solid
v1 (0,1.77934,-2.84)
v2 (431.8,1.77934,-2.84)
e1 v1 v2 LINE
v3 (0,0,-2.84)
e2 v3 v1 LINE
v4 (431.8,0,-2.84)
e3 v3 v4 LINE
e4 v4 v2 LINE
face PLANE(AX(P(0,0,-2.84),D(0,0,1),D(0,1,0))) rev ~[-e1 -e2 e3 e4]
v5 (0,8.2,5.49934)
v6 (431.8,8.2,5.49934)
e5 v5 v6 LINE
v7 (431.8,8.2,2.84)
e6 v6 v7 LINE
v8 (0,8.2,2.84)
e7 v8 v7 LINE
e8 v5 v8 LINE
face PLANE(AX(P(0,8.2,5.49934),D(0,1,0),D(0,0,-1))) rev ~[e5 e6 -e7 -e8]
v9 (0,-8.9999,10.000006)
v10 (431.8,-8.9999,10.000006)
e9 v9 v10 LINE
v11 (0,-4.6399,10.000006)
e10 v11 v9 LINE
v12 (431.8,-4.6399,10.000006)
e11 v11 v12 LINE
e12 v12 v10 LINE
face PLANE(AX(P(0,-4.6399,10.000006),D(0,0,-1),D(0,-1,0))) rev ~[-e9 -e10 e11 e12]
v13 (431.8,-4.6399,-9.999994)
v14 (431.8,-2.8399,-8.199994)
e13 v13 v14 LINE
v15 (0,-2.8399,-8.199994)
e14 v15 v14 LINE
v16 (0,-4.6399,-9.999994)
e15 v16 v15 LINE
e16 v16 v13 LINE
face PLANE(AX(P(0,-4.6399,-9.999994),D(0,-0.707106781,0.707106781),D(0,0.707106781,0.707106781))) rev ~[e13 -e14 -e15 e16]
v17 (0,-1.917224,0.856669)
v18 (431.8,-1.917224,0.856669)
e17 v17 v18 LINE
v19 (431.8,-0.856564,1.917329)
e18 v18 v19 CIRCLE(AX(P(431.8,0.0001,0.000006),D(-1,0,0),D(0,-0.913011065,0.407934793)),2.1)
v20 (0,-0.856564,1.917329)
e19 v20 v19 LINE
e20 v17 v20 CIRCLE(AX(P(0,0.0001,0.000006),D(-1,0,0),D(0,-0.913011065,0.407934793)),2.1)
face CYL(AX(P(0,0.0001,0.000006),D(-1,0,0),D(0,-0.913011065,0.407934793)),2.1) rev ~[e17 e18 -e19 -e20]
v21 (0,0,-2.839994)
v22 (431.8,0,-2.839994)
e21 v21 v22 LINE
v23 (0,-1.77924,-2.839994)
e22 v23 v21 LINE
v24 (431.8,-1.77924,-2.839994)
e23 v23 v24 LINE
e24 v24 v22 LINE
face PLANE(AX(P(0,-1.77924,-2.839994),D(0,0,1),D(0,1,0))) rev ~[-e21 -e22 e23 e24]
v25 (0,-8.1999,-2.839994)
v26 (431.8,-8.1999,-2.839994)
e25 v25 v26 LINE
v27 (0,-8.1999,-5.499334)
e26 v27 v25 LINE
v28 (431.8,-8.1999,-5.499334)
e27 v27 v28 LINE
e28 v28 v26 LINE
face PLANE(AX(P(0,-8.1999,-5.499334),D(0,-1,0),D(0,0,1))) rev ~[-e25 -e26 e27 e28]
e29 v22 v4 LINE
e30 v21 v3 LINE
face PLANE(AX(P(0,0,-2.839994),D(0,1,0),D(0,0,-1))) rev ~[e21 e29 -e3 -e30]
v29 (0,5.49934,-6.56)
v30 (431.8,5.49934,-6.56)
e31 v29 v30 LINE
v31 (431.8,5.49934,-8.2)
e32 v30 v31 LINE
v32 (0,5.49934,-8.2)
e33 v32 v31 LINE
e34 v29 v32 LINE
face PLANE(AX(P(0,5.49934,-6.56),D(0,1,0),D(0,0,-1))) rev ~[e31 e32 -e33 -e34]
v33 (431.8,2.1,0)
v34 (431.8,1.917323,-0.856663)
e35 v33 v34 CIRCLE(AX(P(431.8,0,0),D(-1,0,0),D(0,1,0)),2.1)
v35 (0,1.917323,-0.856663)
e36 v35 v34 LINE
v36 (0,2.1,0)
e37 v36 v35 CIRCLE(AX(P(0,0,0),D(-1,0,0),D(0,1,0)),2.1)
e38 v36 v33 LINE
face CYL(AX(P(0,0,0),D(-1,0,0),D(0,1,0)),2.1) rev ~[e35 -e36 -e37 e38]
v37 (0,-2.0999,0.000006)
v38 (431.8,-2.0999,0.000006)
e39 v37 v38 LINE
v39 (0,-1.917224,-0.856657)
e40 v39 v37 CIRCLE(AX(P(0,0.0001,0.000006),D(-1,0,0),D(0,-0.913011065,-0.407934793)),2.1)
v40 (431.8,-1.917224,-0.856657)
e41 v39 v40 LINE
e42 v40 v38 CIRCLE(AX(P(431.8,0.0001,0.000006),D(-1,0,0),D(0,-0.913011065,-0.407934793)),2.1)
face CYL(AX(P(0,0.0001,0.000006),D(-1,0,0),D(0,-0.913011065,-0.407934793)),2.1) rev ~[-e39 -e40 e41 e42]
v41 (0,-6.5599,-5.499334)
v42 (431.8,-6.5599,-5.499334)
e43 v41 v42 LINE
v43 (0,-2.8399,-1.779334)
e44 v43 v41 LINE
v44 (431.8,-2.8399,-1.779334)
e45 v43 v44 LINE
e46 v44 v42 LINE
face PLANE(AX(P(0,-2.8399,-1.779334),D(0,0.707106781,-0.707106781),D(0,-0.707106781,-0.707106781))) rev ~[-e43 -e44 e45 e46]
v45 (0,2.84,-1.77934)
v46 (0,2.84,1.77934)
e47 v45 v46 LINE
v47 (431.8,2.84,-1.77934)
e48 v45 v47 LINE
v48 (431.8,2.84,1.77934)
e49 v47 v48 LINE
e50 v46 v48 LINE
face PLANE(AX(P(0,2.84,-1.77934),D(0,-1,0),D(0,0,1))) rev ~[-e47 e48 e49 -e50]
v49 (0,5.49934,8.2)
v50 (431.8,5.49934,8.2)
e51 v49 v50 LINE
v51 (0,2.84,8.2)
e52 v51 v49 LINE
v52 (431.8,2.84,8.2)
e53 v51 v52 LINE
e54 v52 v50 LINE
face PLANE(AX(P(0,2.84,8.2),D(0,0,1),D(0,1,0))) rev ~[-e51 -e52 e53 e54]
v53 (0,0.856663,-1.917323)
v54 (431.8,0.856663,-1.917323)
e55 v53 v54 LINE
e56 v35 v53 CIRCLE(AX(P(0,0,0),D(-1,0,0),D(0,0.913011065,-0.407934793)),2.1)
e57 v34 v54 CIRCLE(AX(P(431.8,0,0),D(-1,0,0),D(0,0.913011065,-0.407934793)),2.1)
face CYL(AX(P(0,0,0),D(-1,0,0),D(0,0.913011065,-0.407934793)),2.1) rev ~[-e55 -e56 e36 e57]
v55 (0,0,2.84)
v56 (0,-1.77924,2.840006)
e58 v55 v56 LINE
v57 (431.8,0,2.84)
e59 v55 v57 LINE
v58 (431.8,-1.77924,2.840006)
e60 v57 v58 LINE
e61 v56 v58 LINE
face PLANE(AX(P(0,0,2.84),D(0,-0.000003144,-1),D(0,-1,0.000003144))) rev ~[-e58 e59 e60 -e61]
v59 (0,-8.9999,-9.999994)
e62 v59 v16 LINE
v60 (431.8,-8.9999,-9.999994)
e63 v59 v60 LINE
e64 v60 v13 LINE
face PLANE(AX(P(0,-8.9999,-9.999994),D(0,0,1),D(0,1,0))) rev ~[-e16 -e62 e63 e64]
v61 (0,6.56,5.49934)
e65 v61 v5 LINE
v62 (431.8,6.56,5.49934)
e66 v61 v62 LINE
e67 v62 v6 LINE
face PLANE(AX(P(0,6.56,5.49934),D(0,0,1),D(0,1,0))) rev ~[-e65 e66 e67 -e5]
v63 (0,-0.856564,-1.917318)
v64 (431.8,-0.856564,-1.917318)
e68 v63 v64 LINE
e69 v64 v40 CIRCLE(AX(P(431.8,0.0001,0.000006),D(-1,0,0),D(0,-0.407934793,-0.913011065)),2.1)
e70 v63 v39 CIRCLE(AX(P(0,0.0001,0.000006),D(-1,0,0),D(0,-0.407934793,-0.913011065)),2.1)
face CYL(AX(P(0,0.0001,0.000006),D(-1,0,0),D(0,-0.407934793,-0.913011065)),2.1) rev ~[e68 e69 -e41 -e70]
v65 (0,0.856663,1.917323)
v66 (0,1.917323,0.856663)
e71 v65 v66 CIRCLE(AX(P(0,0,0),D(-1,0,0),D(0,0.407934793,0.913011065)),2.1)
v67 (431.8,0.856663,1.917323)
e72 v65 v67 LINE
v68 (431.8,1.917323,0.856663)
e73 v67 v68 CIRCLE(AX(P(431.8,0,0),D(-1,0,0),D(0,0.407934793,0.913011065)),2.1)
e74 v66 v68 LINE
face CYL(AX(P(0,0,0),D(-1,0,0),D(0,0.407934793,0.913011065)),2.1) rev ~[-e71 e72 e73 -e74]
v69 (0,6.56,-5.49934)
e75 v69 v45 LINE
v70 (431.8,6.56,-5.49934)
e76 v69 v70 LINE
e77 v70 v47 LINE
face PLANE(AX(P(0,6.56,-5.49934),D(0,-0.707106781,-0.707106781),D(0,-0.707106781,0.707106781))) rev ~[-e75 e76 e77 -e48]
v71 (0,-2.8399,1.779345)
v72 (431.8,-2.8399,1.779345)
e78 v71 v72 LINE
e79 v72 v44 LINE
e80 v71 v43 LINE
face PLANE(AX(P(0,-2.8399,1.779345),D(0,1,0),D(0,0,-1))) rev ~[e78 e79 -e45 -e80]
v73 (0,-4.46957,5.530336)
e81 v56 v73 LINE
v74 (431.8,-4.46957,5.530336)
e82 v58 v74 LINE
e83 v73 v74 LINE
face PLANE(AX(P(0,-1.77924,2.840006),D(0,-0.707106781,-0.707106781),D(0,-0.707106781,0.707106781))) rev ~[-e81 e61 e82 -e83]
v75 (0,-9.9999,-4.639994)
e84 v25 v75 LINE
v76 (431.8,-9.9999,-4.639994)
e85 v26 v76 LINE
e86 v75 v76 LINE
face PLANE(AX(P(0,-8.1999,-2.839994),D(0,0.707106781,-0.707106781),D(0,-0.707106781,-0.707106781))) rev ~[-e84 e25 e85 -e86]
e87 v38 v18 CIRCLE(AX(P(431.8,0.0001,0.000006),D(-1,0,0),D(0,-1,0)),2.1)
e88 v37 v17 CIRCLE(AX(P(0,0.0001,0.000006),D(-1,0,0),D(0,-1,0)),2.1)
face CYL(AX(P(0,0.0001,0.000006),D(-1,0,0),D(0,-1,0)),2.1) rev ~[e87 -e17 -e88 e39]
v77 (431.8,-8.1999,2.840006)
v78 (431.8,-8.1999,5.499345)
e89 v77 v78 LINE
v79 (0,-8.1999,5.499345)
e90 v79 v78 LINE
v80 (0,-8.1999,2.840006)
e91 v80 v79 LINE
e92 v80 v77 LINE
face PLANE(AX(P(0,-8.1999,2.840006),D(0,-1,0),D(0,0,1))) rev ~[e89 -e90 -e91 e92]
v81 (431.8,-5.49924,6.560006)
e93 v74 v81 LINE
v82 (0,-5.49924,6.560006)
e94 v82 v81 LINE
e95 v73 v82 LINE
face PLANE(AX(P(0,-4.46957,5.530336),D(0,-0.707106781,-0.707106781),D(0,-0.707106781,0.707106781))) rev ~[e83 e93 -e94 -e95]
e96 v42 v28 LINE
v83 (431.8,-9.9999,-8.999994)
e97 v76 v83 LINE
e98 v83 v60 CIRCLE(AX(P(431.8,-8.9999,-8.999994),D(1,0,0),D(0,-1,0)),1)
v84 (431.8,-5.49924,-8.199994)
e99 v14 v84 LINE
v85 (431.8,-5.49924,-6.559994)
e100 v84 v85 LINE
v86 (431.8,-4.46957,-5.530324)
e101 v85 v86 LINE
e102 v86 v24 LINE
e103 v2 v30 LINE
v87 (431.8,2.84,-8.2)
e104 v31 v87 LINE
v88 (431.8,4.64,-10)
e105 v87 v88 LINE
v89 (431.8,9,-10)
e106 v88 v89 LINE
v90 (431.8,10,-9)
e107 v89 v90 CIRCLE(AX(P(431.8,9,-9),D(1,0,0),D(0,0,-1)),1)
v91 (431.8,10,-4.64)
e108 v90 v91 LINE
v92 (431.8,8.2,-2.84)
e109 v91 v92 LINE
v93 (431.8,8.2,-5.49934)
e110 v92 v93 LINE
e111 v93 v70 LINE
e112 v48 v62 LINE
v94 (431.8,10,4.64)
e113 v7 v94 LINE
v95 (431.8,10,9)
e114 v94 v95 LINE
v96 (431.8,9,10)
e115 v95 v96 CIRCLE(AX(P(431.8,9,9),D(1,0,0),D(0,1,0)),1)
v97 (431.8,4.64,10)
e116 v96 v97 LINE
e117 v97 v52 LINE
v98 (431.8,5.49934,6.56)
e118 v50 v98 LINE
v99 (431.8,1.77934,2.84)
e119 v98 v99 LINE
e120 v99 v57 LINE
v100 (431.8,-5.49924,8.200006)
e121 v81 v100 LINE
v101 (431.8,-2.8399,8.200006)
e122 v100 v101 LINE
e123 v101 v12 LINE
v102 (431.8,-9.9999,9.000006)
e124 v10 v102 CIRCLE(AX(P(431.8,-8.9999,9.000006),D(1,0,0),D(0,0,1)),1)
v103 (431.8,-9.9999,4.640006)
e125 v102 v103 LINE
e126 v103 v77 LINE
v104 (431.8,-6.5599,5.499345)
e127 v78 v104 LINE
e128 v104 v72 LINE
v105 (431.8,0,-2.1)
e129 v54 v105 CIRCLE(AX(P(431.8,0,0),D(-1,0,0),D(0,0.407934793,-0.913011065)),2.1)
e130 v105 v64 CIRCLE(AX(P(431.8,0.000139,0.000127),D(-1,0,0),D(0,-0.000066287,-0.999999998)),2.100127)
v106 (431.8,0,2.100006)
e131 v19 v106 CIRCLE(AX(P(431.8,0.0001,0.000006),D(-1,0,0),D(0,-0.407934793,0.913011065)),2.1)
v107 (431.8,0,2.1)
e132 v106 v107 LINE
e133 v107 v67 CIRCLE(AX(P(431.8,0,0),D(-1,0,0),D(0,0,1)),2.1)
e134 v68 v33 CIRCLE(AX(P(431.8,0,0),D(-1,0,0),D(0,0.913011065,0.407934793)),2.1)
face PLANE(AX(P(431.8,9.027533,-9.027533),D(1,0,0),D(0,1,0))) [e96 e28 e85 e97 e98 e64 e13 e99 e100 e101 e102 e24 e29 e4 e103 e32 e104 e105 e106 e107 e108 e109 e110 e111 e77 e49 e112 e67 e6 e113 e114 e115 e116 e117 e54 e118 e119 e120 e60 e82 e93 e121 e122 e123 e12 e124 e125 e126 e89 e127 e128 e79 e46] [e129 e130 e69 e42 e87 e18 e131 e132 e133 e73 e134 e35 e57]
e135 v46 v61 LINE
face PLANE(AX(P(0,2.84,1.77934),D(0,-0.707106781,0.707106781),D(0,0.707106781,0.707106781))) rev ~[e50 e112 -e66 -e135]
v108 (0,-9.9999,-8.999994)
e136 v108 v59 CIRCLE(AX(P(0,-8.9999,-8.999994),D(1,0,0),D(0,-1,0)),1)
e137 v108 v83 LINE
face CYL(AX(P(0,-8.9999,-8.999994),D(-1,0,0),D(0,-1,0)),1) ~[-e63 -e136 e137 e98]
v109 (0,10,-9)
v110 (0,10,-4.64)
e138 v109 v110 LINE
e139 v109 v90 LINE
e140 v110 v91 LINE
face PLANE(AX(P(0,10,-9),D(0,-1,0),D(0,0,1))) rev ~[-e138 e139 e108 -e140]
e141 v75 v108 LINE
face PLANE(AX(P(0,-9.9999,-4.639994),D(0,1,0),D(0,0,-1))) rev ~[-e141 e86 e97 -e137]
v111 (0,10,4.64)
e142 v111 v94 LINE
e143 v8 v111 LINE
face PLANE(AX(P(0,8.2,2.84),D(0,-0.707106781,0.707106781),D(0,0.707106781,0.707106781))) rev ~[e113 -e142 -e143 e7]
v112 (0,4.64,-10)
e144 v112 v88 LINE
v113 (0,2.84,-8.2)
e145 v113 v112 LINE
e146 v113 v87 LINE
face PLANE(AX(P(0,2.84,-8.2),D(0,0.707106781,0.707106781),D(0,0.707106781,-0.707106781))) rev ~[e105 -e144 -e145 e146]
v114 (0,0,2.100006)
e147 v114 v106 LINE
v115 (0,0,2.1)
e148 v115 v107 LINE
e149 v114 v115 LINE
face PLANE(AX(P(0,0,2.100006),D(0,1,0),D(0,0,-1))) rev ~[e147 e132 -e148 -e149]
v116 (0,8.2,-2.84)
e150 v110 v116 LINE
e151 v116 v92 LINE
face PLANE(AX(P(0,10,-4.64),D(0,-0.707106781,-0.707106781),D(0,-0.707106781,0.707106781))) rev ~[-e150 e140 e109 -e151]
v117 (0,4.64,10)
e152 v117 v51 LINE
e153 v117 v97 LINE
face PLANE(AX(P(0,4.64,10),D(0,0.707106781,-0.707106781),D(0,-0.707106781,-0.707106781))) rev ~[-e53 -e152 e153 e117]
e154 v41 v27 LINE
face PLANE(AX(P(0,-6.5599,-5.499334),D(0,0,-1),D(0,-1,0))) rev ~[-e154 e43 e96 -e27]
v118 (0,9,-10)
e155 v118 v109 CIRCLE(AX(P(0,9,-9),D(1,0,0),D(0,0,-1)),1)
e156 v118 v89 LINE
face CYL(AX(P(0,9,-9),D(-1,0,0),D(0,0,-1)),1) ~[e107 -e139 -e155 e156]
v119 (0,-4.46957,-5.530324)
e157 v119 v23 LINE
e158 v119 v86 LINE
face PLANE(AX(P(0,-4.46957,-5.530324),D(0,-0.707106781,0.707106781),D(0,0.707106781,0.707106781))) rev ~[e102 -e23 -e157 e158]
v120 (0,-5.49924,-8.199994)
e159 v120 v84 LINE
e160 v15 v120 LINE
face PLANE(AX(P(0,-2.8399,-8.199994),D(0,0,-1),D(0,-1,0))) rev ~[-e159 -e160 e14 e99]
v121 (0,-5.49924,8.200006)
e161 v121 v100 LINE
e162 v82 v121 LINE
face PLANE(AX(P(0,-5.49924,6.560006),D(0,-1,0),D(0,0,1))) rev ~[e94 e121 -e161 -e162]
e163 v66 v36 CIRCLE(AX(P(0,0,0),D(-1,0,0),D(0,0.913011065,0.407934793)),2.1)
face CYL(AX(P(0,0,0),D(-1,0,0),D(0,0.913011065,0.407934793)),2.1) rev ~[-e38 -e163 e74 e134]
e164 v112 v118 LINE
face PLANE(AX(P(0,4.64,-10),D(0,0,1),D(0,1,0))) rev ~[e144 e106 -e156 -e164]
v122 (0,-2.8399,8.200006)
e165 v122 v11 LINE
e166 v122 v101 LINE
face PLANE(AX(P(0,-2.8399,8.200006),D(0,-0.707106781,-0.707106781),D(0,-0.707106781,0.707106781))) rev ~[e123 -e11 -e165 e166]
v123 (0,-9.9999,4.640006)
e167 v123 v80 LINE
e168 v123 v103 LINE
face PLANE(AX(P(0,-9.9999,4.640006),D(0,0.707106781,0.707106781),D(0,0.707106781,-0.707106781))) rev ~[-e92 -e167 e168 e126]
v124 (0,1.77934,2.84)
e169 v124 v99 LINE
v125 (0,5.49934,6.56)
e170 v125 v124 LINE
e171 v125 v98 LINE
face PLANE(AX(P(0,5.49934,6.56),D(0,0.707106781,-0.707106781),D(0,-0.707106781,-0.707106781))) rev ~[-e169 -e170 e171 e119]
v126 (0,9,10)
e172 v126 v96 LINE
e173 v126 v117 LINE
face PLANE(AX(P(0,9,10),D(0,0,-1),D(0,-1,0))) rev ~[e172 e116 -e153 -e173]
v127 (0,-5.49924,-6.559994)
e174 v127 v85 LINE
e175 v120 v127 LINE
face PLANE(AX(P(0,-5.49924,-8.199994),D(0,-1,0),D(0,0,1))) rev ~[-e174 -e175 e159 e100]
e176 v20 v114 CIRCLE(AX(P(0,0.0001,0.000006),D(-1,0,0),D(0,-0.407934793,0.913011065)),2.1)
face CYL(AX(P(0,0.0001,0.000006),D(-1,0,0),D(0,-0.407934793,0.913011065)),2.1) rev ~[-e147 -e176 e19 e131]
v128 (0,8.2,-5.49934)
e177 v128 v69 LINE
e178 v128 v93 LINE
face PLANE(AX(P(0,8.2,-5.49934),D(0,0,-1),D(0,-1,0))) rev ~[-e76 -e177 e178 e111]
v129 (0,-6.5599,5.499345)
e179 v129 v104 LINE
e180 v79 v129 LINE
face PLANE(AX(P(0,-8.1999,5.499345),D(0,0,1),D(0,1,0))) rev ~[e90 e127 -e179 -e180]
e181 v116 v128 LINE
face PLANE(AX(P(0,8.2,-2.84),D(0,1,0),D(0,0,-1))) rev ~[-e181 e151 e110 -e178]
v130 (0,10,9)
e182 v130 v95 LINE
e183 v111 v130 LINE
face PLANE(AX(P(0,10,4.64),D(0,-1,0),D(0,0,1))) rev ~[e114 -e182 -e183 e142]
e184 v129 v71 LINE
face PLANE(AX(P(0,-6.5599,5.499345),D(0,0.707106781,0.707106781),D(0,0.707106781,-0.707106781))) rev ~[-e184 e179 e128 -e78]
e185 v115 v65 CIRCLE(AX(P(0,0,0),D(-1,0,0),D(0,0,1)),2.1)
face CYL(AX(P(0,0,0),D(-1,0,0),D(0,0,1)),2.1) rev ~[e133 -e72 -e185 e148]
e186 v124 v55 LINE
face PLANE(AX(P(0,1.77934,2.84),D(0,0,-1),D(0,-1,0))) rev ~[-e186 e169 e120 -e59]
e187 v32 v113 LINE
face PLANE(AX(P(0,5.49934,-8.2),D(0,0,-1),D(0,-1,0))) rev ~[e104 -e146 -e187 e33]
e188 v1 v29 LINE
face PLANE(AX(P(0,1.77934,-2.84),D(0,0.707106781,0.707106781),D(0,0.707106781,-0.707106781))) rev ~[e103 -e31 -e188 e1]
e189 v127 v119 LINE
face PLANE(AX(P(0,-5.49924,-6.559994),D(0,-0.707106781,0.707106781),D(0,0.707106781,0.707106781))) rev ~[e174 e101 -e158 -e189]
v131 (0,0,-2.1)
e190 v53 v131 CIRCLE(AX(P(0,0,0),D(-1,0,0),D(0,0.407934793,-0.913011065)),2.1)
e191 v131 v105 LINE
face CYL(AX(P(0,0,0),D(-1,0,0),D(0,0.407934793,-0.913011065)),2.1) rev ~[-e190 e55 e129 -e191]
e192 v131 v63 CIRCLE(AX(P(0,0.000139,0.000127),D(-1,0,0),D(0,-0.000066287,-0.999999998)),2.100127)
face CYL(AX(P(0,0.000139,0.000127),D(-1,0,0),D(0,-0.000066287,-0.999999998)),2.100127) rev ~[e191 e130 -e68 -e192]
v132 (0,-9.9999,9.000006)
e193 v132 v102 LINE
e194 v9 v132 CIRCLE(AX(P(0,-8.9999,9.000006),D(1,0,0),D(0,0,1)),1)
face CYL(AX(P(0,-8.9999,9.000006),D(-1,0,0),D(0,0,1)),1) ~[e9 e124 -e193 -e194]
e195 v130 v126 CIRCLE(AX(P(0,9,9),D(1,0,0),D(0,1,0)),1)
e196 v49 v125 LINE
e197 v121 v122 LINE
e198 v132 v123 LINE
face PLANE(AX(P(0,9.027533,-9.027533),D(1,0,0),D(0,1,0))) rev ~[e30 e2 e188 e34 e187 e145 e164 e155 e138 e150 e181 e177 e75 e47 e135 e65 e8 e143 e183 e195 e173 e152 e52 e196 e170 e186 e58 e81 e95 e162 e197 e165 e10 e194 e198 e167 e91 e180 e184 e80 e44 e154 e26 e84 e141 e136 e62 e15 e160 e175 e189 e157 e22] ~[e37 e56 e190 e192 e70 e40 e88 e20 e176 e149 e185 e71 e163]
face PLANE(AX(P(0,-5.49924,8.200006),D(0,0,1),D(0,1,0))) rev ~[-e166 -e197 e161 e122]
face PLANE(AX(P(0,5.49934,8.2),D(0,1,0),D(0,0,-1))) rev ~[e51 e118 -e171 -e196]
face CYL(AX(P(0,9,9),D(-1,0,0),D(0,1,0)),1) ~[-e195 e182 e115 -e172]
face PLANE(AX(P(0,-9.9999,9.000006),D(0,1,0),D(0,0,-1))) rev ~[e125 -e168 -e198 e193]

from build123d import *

# Parameters (mm, degrees)
F1_DEPTH = 431.8


# Not quite as in the source:
# - ends of sketch curves that miss each other by under 0.0002 mm in the source are joined


with BuildPart() as f1:
    # F0 (on Right) → F1 (new body)
    with BuildSketch(Plane.YZ):
        with BuildLine():
            Line((8.2, -10), (9, -10))
            ThreePointArc((9, -10), (9.7071067812, -9.7071067812), (10, -9))
            Line((10, -9), (10, -8.2))
            Line((10, -8.2), (8.2, -8.2))
            Line((8.2, -8.2), (8.2, -10))
        make_face()
        Polygon((5.4993398282, -8.2), (7.1393398282, -8.2), (5.4993398282, -6.56), align=None)
        Polygon((6.56, -5.4993398282), (8.2, -7.1393398282), (8.2, -5.4993398282), align=None)
        with BuildLine():
            Line((8.2, 10), (8.2, 8.2))
            Line((8.2, 8.2), (10, 8.2))
            Line((10, 8.2), (10, 9))
            ThreePointArc((10, 9), (9.7071067812, 9.7071067812), (9, 10))
            Line((9, 10), (8.2, 10))
        make_face()
        Polygon((8.2, 7.1393398282), (6.56, 5.4993398282), (8.2, 5.4993398282), align=None)
        Polygon((5.4993398282, 8.2), (5.4993398282, 6.56), (7.1393398282, 8.2), align=None)
        with BuildLine():
            Line((-9.9999004684, 8.2000055944), (-8.1999004684, 8.2000055944))
            Line((-8.1999004684, 8.2000055944), (-8.1999004684, 10.0000055944))
            Line((-8.1999004684, 10.0000055944), (-8.9999004684, 10.0000055944))
            ThreePointArc((-8.9999004684, 10.0000055944), (-9.7070072496, 9.7071123756), (-9.9999004684, 9.0000055944))
            Line((-9.9999004684, 9.0000055944), (-9.9999004684, 8.2000055944))
        make_face()
        Polygon((-7.1392402967, 8.2000055944), (-5.4992402967, 6.5600055944), (-5.4992402967, 8.2000055944), align=None)
        Polygon((-8.1999004684, 5.4993454226), (-6.5599004684, 5.4993454226), (-8.1999004684, 7.1393454226), align=None)
        with BuildLine():
            Line((-8.1999004684, -9.9999944056), (-8.1999004684, -8.1999944056))
            Line((-8.1999004684, -8.1999944056), (-9.9999004684, -8.1999944056))
            Line((-9.9999004684, -8.1999944056), (-9.9999004684, -8.9999944056))
            ThreePointArc((-9.9999004684, -8.9999944056), (-9.7070072496, -9.7071011868), (-8.9999004684, -9.9999944056))
            Line((-8.9999004684, -9.9999944056), (-8.1999004684, -9.9999944056))
        make_face()
        Polygon((-8.1999004684, -7.1393342338), (-6.5599004684, -5.4993342338), (-8.1999004684, -5.4993342338), align=None)
        Polygon((-5.4992402967, -8.1999944056), (-5.4992402967, -6.5599944056), (-7.1392402967, -8.1999944056), align=None)
        with BuildLine():
            Line((1.9173232366, -0.8566630648), (2.84, -1.7793398282))
            Line((2.84, -1.7793398282), (2.84, 0))
            Line((2.84, 0), (2.1, 0))
            ThreePointArc((2.1, 0), (2.0538231176, -0.4379618723), (1.9173232366, -0.8566630648))
        make_face()
        with BuildLine():
            Line((0, -2.84), (1.7793398282, -2.84))
            Line((1.7793398282, -2.84), (0.8566630648, -1.9173232366))
            ThreePointArc((0.8566630648, -1.9173232366), (0.4379618723, -2.0538231176), (0, -2.1))
            Line((0, -2.1), (0, -2.84))
        make_face()
        with BuildLine():
            Line((-1.7792402967, -2.8399944056), (9.95316e-05, -2.8399944056))
            Line((9.95316e-05, -2.8399944056), (0, -2.1))
            ThreePointArc((0, -2.1), (-0.4378623408, -2.0538175232), (-0.8565635332, -1.9173176422))
            Line((-0.8565635332, -1.9173176422), (-1.7792402967, -2.8399944056))
        make_face()
        Polygon((4.64, -10), (8.2, -10), (8.2, -8.2), (7.1393398282, -8.2), (5.4993398282, -8.2), (2.84, -8.2), align=None)
        Polygon((8.2, -8.2), (10, -8.2), (10, -4.64), (8.2, -2.84), (8.2, -5.4993398282), (8.2, -7.1393398282), align=None)
        with BuildLine():
            ThreePointArc((0, 2.1), (0.4379618723, 2.0538231176), (0.8566630648, 1.9173232366))
            Line((0.8566630648, 1.9173232366), (1.7793398282, 2.84))
            Line((1.7793398282, 2.84), (0, 2.84))
            Line((0, 2.84), (0, 2.1))
        make_face()
        with BuildLine():
            Line((2.1, 0), (2.84, 0))
            Line((2.84, 0), (2.84, 1.7793398282))
            Line((2.84, 1.7793398282), (1.9173232366, 0.8566630648))
            ThreePointArc((1.9173232366, 0.8566630648), (2.0538231176, 0.4379618723), (2.1, 0))
        make_face()
        with BuildLine():
            ThreePointArc((-0.8565635332, 1.917328831), (-0.4378623408, 2.053828712), (9.95316e-05, 2.1000055944))
            Line((9.95316e-05, 2.1000055944), (0, 2.84))
            Line((0, 2.84), (-1.7792402967, 2.8400055944))
            Line((-1.7792402967, 2.8400055944), (-0.8565635332, 1.917328831))
        make_face()
        Polygon((8.2, 8.2), (8.2, 7.1393398282), (8.2, 5.4993398282), (8.2, 2.84), (10, 4.64), (10, 8.2), align=None)
        Polygon((7.1393398282, 8.2), (8.2, 8.2), (8.2, 10), (4.64, 10), (2.84, 8.2), (5.4993398282, 8.2), align=None)
        with BuildLine():
            Line((-2.8399004684, 1.7793454226), (-2.8399004684, 5.5944e-06))
            Line((-2.8399004684, 5.5944e-06), (-2.0999004684, 5.5944e-06))
            ThreePointArc((-2.0999004684, 5.5944e-06), (-2.053723586, 0.4379674667), (-1.917223705, 0.8566686592))
            Line((-1.917223705, 0.8566686592), (-2.8399004684, 1.7793454226))
        make_face()
        Polygon((-8.1999004684, 10.0000055944), (-8.1999004684, 8.2000055944), (-7.1392402967, 8.2000055944), (-5.4992402967, 8.2000055944), (-2.8399004684, 8.2000055944), (-4.6399004684, 10.0000055944), align=None)
        Polygon((-8.1999004684, 5.4993454226), (-8.1999004684, 7.1393454226), (-8.1999004684, 8.2000055944), (-9.9999004684, 8.2000055944), (-9.9999004684, 4.6400055944), (-8.1999004684, 2.8400055944), align=None)
        with BuildLine():
            Line((-2.8399004684, 5.5944e-06), (-2.8399004684, -1.7793342338))
            Line((-2.8399004684, -1.7793342338), (-1.917223705, -0.8566574704))
            ThreePointArc((-1.917223705, -0.8566574704), (-2.053723586, -0.4379562779), (-2.0999004684, 5.5944e-06))
            Line((-2.0999004684, 5.5944e-06), (-2.8399004684, 5.5944e-06))
        make_face()
        Polygon((-9.9999004684, -8.1999944056), (-8.1999004684, -8.1999944056), (-8.1999004684, -7.1393342338), (-8.1999004684, -5.4993342338), (-8.1999004684, -2.8399944056), (-9.9999004684, -4.6399944056), align=None)
        Polygon((-5.4992402967, -8.1999944056), (-7.1392402967, -8.1999944056), (-8.1999004684, -8.1999944056), (-8.1999004684, -9.9999944056), (-4.6399004684, -9.9999944056), (-2.8399004684, -8.1999944056), align=None)
        with BuildLine():
            Line((-2.8399004684, -1.7793342338), (-1.7792402967, -2.8399944056))
            Line((-1.7792402967, -2.8399944056), (-0.8565635332, -1.9173176422))
            ThreePointArc((-0.8565635332, -1.9173176422), (-1.4848247089, -1.4849186461), (-1.917223705, -0.8566574704))
            Line((-1.917223705, -0.8566574704), (-2.8399004684, -1.7793342338))
        make_face()
        Polygon((-4.4695703825, -5.5303244915), (-1.7792402967, -2.8399944056), (-2.8399004684, -1.7793342338), (-5.5302305543, -4.4696643197), (-6.5599004684, -5.4993342338), (-8.1999004684, -7.1393342338), (-8.1999004684, -8.1999944056), (-7.1392402967, -8.1999944056), (-5.4992402967, -6.5599944056), align=None)
        with BuildLine():
            Line((7.1393398282, -8.2), (8.2, -8.2))
            Line((8.2, -8.2), (8.2, -7.1393398282))
            Line((8.2, -7.1393398282), (6.56, -5.4993398282))
            Line((6.56, -5.4993398282), (5.5303300859, -4.4696699141))
            Line((5.5303300859, -4.4696699141), (2.84, -1.7793398282))
            Line((2.84, -1.7793398282), (1.9173232366, -0.8566630648))
            ThreePointArc((1.9173232366, -0.8566630648), (1.4849242405, -1.4849242405), (0.8566630648, -1.9173232366))
            Line((0.8566630648, -1.9173232366), (1.7793398282, -2.84))
            Line((1.7793398282, -2.84), (4.4696699141, -5.5303300859))
            Line((4.4696699141, -5.5303300859), (5.4993398282, -6.56))
            Line((5.4993398282, -6.56), (7.1393398282, -8.2))
        make_face()
        with BuildLine():
            Line((1.9173232366, 0.8566630648), (2.84, 1.7793398282))
            Line((2.84, 1.7793398282), (5.5303300859, 4.4696699141))
            Line((5.5303300859, 4.4696699141), (6.56, 5.4993398282))
            Line((6.56, 5.4993398282), (8.2, 7.1393398282))
            Line((8.2, 7.1393398282), (8.2, 8.2))
            Line((8.2, 8.2), (7.1393398282, 8.2))
            Line((7.1393398282, 8.2), (5.4993398282, 6.56))
            Line((5.4993398282, 6.56), (4.4696699141, 5.5303300859))
            Line((4.4696699141, 5.5303300859), (1.7793398282, 2.84))
            Line((1.7793398282, 2.84), (0.8566630648, 1.9173232366))
            ThreePointArc((0.8566630648, 1.9173232366), (1.4849242405, 1.4849242405), (1.9173232366, 0.8566630648))
        make_face()
        with BuildLine():
            Line((-5.5302305543, 4.4696755085), (-2.8399004684, 1.7793454226))
            Line((-2.8399004684, 1.7793454226), (-1.917223705, 0.8566686592))
            ThreePointArc((-1.917223705, 0.8566686592), (-1.4848247089, 1.4849298349), (-0.8565635332, 1.917328831))
            Line((-0.8565635332, 1.917328831), (-1.7792402967, 2.8400055944))
            Line((-1.7792402967, 2.8400055944), (-4.4695703825, 5.5303356803))
            Line((-4.4695703825, 5.5303356803), (-5.4992402967, 6.5600055944))
            Line((-5.4992402967, 6.5600055944), (-7.1392402967, 8.2000055944))
            Line((-7.1392402967, 8.2000055944), (-8.1999004684, 8.2000055944))
            Line((-8.1999004684, 8.2000055944), (-8.1999004684, 7.1393454226))
            Line((-8.1999004684, 7.1393454226), (-6.5599004684, 5.4993454226))
            Line((-6.5599004684, 5.4993454226), (-5.5302305543, 4.4696755085))
        make_face()
    extrude(amount=F1_DEPTH)


solid = f1.part
